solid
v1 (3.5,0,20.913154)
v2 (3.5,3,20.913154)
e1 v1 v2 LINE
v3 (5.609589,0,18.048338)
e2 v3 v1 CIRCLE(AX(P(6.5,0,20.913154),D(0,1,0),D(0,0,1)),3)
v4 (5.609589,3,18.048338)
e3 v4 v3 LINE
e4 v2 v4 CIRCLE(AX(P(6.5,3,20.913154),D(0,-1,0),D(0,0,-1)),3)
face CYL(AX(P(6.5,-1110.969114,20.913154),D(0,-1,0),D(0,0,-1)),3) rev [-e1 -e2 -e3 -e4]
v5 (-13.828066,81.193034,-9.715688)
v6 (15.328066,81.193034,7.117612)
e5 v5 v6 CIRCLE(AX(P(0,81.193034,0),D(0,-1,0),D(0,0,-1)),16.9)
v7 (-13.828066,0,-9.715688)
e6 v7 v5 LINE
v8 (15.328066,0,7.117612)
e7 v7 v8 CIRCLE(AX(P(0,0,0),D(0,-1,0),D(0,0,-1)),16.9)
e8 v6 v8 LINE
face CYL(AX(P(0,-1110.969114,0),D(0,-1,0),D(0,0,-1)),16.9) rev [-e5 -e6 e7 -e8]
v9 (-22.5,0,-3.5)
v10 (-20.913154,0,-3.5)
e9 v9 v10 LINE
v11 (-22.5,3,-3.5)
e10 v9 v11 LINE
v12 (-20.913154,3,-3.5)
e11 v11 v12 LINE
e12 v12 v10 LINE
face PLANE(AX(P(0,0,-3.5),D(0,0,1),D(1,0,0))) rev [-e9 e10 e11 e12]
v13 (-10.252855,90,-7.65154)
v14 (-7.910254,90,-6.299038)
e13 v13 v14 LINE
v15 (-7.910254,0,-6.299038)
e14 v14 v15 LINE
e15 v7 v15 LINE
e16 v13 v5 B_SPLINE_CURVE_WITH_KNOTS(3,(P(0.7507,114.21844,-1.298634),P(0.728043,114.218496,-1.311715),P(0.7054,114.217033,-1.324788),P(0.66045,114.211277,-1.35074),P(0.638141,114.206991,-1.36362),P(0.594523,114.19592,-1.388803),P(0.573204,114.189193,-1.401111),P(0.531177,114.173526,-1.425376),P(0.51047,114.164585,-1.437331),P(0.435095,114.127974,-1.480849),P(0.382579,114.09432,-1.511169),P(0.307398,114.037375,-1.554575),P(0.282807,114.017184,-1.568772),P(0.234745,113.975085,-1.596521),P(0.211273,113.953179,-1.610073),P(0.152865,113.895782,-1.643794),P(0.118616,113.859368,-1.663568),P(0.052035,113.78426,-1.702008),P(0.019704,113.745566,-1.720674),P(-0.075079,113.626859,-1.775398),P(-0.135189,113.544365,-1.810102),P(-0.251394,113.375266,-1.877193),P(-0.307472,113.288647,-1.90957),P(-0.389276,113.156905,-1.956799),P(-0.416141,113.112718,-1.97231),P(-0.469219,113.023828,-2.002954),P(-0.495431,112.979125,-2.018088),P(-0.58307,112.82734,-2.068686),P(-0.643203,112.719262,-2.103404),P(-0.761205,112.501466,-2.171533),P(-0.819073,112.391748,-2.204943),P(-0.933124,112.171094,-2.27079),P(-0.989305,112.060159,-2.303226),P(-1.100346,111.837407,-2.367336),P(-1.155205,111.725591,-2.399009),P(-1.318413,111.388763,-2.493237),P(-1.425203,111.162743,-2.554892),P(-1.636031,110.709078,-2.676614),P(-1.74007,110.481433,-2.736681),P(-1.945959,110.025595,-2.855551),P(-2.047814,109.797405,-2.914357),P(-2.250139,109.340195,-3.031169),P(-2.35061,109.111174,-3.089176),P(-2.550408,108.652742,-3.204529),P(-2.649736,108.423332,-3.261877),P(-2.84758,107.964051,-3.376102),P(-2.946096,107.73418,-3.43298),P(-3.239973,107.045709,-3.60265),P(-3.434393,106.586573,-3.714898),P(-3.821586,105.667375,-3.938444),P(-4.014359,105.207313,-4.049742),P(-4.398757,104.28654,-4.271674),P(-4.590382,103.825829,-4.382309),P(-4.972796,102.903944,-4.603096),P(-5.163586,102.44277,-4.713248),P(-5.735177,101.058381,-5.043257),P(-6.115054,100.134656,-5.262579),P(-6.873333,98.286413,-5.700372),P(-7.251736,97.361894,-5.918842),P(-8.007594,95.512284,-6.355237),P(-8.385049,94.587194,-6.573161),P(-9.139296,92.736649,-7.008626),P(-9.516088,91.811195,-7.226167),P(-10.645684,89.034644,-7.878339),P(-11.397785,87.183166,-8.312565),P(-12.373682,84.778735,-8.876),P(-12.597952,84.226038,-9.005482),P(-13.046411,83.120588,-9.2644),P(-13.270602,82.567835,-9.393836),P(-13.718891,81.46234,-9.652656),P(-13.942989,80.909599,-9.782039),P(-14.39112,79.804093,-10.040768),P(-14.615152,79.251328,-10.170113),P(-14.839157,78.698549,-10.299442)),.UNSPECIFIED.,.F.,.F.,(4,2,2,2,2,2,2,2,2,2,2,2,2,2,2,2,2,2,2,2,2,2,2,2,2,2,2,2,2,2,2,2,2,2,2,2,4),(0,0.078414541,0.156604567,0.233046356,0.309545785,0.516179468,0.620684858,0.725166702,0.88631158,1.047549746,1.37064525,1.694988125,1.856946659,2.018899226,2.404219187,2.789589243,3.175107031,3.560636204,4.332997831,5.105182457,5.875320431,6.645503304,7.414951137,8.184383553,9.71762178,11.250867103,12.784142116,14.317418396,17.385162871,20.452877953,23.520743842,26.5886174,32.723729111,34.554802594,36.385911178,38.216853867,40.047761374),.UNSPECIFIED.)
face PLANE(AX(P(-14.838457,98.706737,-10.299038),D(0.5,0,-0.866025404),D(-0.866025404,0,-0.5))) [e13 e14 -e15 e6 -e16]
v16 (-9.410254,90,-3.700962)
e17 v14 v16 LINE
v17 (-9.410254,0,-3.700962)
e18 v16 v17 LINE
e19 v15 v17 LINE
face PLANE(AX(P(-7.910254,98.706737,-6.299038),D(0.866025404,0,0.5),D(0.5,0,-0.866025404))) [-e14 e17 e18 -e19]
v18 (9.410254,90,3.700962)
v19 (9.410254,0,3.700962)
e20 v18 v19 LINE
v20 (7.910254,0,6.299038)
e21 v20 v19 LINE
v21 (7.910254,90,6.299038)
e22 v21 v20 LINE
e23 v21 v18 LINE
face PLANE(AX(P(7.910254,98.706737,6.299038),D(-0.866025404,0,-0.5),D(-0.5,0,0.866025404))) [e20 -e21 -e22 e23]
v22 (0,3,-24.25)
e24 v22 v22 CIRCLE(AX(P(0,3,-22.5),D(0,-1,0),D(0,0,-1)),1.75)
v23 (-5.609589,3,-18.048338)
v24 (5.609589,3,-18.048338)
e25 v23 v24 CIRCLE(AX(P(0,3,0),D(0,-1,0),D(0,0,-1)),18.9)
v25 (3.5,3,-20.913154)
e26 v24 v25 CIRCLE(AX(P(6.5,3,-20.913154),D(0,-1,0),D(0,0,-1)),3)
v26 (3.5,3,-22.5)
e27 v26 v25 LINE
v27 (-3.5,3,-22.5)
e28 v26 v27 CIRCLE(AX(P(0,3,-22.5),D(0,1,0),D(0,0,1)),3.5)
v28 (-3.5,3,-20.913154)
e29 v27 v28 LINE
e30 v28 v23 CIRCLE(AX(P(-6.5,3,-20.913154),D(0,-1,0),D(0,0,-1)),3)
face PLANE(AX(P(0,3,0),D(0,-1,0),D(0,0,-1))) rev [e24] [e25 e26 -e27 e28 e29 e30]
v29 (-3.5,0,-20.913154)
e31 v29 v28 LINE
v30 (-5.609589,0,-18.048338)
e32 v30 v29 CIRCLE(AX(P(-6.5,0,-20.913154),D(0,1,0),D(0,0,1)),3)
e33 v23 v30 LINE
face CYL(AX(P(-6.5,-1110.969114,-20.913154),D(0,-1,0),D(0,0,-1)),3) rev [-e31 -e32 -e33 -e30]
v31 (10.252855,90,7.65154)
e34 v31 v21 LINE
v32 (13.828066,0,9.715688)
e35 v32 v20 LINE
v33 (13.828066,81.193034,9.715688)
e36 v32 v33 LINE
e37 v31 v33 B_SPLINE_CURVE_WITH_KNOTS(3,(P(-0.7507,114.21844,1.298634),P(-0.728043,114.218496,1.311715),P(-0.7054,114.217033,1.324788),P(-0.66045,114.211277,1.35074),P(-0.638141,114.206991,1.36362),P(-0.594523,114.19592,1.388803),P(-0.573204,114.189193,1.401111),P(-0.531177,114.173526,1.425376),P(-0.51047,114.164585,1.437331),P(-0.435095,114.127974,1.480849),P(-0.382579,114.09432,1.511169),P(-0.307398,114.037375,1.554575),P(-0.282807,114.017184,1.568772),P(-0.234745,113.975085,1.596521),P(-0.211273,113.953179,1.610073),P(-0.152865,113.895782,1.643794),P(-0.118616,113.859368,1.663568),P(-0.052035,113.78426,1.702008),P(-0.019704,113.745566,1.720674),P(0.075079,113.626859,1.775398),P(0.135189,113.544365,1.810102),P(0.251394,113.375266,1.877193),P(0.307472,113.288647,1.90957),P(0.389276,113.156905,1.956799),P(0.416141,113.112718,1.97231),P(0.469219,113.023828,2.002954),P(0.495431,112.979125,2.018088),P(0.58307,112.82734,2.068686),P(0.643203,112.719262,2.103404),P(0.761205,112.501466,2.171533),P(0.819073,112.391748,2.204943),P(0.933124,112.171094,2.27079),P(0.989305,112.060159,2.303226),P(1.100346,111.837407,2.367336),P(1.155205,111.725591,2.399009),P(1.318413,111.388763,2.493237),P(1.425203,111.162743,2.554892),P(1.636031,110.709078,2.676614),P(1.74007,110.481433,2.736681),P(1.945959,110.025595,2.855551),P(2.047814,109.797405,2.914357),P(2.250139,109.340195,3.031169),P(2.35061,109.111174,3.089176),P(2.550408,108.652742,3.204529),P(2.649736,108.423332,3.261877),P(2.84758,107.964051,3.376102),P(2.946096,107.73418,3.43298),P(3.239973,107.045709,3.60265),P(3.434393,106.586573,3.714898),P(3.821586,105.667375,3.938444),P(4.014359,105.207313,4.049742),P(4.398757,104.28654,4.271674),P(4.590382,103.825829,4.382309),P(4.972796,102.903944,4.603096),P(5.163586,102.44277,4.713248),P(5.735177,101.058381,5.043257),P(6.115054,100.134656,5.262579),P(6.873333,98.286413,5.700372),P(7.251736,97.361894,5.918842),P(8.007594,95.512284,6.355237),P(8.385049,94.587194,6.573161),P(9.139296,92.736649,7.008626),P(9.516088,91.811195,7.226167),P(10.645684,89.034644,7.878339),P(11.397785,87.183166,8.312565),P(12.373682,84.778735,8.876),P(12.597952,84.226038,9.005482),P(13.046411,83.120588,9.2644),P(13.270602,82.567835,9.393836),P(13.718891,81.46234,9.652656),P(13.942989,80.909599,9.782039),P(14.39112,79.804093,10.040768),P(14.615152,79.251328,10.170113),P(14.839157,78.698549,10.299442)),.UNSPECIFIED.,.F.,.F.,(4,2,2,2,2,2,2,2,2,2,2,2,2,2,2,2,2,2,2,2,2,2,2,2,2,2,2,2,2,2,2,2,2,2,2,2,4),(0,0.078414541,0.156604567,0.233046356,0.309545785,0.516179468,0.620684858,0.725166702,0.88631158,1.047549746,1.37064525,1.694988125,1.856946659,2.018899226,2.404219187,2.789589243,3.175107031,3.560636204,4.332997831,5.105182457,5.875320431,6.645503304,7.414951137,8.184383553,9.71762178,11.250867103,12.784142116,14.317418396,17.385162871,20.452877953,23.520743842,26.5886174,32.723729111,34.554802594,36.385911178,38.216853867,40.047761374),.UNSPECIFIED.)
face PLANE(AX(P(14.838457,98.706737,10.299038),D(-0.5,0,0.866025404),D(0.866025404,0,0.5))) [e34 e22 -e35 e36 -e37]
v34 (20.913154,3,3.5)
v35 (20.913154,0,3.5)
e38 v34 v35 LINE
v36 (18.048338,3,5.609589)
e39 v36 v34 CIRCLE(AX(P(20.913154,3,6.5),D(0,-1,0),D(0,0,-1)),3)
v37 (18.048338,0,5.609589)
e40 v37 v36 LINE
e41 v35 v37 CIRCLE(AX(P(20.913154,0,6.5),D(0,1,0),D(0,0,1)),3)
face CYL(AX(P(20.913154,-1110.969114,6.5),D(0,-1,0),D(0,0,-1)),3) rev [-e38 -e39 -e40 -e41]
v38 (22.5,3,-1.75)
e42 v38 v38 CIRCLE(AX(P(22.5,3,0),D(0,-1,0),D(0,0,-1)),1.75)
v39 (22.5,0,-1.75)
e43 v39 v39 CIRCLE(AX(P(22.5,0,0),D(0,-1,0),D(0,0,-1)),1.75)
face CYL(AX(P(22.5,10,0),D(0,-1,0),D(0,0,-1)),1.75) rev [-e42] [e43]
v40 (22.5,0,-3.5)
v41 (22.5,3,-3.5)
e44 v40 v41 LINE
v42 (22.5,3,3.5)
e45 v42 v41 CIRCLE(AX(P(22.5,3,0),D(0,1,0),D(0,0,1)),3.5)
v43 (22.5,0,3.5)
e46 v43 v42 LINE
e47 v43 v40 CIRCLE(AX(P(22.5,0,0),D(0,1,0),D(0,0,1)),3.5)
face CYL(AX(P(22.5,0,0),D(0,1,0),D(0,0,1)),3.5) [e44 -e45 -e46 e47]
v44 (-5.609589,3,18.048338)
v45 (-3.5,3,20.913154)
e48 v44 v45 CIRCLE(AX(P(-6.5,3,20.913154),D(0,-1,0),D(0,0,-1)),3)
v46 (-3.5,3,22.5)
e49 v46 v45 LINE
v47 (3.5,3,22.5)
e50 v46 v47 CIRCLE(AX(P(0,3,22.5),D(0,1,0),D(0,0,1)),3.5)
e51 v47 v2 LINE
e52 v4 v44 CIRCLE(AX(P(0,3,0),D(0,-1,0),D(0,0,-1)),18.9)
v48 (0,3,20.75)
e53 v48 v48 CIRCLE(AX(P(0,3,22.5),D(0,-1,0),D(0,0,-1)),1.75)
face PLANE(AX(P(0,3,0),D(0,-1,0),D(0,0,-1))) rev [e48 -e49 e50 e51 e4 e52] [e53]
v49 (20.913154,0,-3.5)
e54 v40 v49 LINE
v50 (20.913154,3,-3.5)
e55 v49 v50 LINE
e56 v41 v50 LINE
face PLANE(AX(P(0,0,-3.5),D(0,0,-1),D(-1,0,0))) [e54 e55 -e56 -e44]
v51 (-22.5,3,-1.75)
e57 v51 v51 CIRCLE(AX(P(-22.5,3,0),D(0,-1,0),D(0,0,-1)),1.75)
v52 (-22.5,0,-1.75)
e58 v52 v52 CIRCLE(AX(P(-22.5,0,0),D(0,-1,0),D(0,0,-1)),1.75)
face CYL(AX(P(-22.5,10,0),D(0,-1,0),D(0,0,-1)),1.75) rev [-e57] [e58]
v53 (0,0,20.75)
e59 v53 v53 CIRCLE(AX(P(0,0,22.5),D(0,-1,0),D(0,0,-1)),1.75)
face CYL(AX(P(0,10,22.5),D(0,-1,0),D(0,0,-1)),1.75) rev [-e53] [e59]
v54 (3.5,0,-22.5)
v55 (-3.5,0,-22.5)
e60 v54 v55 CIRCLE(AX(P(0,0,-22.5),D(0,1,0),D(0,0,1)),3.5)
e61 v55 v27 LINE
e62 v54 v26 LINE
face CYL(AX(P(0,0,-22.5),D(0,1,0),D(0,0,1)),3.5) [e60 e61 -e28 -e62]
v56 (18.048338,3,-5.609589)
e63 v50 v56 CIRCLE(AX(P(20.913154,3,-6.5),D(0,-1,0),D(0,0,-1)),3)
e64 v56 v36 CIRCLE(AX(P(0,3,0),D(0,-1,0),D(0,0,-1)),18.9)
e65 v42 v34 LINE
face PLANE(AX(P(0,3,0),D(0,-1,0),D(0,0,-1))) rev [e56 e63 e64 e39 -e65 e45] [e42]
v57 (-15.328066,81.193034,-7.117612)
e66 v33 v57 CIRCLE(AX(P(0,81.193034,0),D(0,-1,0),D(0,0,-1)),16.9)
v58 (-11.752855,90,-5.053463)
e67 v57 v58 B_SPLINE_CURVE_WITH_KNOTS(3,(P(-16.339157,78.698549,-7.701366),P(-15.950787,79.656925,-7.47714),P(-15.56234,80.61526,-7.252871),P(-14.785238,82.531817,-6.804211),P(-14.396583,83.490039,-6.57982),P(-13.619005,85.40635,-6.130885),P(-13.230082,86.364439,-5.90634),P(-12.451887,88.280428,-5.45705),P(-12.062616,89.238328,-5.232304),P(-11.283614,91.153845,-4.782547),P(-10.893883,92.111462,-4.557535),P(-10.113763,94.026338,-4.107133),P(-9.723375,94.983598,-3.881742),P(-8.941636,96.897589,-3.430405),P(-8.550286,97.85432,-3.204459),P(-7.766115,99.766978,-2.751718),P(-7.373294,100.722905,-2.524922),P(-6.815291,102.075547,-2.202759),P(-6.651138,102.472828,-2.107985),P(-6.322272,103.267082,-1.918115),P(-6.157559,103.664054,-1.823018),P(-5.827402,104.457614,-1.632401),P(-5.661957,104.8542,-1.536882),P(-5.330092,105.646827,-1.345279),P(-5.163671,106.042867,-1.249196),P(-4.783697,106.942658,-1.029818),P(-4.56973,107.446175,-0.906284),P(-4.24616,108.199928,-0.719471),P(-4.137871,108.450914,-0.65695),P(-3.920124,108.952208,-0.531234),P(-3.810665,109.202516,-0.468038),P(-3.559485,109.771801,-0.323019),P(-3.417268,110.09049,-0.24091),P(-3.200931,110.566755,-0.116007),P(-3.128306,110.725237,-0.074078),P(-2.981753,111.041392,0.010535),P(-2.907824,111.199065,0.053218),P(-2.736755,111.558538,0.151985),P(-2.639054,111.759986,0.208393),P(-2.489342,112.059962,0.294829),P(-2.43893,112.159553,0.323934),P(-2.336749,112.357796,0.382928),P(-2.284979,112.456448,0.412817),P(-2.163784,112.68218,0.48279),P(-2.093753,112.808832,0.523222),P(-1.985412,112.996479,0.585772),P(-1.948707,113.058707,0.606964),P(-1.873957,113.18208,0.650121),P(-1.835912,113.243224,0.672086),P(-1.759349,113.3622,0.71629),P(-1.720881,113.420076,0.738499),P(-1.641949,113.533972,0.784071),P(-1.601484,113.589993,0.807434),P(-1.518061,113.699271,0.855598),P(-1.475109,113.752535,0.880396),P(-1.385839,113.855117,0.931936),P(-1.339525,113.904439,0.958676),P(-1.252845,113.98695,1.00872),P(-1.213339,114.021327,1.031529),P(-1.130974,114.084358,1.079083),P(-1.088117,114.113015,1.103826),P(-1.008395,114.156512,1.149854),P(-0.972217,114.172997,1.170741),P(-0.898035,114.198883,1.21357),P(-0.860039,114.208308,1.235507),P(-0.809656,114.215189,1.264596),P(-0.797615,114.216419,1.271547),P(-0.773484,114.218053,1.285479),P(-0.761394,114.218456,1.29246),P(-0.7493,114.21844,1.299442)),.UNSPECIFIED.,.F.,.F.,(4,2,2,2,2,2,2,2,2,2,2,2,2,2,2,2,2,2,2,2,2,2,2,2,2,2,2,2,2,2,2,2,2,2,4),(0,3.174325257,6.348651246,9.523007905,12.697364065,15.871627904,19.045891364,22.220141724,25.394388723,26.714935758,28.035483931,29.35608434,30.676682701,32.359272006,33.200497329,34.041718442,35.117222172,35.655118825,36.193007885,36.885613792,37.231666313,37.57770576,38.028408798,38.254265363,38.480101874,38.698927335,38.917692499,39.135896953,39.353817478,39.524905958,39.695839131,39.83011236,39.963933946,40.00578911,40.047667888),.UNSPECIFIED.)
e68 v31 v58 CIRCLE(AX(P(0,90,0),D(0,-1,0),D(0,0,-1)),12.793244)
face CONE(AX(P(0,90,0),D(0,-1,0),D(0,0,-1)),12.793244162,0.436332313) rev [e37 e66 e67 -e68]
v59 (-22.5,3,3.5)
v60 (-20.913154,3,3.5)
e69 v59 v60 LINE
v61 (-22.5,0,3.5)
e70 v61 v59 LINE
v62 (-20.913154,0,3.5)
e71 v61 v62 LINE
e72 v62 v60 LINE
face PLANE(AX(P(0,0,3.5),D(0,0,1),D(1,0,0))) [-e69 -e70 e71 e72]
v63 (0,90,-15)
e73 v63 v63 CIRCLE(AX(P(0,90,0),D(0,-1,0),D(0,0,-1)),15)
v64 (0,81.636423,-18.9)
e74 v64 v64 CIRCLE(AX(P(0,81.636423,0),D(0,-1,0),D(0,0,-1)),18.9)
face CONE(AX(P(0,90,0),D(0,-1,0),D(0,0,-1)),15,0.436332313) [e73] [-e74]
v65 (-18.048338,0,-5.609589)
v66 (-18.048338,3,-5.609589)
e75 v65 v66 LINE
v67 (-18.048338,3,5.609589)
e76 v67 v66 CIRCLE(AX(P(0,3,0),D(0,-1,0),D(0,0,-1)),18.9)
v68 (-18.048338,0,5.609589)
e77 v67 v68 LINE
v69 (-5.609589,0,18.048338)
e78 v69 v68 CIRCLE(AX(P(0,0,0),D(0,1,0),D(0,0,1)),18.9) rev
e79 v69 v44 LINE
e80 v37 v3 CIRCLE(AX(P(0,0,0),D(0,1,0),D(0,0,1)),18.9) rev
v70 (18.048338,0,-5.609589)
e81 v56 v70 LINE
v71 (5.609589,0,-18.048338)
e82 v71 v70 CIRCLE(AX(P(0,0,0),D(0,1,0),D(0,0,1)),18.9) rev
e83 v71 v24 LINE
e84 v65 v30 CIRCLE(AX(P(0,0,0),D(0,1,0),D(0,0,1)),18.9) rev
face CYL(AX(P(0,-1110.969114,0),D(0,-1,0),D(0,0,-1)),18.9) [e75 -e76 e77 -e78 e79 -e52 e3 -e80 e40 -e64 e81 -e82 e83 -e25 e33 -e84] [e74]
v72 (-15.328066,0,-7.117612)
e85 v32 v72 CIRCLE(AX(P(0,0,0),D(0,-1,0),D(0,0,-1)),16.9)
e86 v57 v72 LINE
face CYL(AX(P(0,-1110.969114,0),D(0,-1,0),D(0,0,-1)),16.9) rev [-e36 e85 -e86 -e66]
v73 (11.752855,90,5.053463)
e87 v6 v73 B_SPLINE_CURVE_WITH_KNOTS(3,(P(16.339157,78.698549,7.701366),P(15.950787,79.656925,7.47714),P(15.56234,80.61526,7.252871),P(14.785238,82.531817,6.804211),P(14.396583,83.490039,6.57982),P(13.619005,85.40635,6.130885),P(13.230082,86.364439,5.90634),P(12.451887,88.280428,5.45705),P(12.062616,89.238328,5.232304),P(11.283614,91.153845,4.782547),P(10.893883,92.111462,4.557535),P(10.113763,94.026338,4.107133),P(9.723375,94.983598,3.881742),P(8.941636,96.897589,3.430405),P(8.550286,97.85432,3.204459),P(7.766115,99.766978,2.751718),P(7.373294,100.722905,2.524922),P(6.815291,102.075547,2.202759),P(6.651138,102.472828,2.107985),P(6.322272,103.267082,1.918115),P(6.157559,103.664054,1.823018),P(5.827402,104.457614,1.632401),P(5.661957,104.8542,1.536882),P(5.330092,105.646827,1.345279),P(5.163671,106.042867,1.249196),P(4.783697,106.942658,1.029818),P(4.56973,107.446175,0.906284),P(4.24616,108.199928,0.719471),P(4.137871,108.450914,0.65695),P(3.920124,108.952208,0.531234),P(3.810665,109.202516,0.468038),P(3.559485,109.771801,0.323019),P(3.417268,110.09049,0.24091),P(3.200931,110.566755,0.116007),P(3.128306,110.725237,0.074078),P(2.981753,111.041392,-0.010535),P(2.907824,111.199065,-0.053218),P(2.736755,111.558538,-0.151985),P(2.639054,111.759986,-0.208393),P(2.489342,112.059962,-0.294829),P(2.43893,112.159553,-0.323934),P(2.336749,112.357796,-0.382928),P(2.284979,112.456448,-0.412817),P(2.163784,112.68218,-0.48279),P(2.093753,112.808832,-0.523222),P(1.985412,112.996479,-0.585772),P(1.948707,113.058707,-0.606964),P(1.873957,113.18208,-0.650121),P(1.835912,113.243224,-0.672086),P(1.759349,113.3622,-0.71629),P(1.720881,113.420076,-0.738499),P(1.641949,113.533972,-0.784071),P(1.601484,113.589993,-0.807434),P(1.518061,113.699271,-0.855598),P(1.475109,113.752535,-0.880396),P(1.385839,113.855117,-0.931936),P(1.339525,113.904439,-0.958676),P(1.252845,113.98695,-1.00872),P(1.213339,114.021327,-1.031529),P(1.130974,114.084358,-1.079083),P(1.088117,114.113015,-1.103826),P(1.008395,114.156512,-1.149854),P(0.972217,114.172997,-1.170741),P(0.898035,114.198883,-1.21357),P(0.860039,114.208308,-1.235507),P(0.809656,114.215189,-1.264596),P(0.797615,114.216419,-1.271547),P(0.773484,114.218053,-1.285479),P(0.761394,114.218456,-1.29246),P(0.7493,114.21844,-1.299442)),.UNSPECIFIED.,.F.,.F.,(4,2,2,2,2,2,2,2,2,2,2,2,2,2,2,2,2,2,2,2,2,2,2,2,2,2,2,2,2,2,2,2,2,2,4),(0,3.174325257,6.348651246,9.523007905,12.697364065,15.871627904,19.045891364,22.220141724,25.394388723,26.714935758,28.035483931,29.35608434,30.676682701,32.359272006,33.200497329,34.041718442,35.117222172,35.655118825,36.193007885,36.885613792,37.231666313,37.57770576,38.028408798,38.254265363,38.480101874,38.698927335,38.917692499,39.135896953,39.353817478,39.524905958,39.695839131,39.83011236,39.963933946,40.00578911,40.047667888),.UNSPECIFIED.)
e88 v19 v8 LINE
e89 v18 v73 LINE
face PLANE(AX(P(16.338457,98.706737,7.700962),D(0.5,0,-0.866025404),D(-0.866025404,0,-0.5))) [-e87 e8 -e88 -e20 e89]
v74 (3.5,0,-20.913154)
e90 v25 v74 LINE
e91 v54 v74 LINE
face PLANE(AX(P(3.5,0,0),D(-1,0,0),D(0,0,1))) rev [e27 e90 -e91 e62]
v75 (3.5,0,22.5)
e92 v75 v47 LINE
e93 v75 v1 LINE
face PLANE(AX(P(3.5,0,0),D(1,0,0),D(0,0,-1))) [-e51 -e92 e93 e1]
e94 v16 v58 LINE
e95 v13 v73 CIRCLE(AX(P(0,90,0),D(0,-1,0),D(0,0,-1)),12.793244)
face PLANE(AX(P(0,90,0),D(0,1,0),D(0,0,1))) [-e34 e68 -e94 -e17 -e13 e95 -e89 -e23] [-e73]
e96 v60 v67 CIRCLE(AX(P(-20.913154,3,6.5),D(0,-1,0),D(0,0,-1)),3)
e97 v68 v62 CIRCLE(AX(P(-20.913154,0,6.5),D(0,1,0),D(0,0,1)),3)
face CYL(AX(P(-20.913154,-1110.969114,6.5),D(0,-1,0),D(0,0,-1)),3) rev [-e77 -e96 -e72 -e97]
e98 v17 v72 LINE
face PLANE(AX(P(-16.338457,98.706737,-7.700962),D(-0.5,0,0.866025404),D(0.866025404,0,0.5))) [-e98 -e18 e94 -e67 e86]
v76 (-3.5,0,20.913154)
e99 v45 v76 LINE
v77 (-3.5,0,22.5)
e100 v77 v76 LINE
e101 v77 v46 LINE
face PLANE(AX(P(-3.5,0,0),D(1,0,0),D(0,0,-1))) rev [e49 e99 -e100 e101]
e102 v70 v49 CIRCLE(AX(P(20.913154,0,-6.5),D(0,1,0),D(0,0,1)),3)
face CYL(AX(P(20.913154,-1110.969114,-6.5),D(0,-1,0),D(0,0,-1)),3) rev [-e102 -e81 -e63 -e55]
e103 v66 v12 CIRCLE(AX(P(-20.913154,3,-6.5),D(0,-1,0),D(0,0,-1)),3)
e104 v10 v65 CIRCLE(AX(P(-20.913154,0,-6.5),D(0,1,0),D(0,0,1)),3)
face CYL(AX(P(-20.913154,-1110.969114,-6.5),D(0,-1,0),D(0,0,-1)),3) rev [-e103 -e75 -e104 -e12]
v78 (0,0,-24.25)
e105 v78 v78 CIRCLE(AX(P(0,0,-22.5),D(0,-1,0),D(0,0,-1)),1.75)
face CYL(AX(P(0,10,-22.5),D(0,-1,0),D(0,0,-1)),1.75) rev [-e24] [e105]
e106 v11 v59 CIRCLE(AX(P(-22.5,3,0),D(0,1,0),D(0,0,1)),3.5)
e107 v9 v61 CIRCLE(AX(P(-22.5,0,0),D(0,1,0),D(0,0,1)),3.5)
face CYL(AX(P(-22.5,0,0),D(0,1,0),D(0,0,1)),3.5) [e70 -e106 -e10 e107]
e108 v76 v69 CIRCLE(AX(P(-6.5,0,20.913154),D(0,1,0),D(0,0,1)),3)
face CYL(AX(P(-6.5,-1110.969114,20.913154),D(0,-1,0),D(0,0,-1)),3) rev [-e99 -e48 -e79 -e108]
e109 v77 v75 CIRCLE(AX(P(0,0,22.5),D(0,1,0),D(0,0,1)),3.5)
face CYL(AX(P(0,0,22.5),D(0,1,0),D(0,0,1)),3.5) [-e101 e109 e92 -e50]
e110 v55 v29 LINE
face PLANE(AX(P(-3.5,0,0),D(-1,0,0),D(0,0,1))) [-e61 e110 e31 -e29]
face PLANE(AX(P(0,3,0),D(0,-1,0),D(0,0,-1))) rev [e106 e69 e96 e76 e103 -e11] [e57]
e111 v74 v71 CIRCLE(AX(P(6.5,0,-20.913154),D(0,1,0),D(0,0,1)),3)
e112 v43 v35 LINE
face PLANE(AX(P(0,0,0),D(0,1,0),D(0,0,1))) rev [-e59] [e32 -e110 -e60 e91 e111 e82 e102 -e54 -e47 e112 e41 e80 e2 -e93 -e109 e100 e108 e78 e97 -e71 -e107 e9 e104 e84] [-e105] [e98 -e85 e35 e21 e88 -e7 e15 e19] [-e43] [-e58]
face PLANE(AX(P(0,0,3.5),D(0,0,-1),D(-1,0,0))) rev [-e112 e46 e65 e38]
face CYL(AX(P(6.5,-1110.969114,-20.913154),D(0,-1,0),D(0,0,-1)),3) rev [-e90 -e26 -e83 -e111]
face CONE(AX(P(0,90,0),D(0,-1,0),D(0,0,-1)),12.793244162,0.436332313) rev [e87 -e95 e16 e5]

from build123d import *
from build123d.topology import SkipClean

# Parameters (mm, degrees)
SKETCH2_R           = 1.75
CUT_EXTRUDE1_DEPTH  = 10
SKETCH4_R           = 36.837485066
SKETCH4_R_2         = 31.9
CUT_EXTRUDE2_DEPTH  = 99.001122443
FILLET1_R           = 3
BOSS_EXTRUDE1_REACH = 99.221


with BuildPart() as part:
    # Sketch1 → Revolve1 (revolve)
    with BuildSketch(Plane(origin=(0, 0, 0), x_dir=(0, 0, -1), z_dir=(1, 0, 0)), mode=Mode.PRIVATE) as revolve1_sk:
        Polygon((-12.793244162, 90), (-15, 90), (-18.9, 81.63642301), (-18.9, 3), (-31.9, 3), (-31.9, 0), (-17.6, 0), (-16.9, 0), (-16.9, 81.193033685), align=None)
    revolve(revolve1_sk.sketch.rotate(Axis((0, -1110.96911415, 0), (0, 1, 0)), 180), axis=Axis((0, -1110.96911415, 0), (0, 1, 0)))

    # Sketch2 → Cut-Extrude1 (cut)
    with BuildSketch(Plane.XZ):
        with Locations(Location((0, 22.5, 0), (0, 0, 270))):
            Circle(SKETCH2_R)
        with Locations(Location((0, -22.5, 0), (0, 0, 270))):
            Circle(SKETCH2_R)
        with Locations(Location((-22.5, 0, 0), (0, 0, 270))):
            Circle(SKETCH2_R)
        with Locations(Location((22.5, 0, 0), (0, 0, 270))):
            Circle(SKETCH2_R)
    extrude(amount=-CUT_EXTRUDE1_DEPTH, mode=Mode.SUBTRACT)

    # Sketch4 → Cut-Extrude2 (cut, through all)
    # profile 1 of 2: a face of its own
    with SkipClean():  # the faces are left unmerged after this step: merging them gives an invalid solid
        with BuildSketch(Plane(origin=(0, 3, 0), x_dir=(1, 0, 0), z_dir=(0, 1, 0))):
            Circle(SKETCH4_R)
            Circle(SKETCH4_R_2, mode=Mode.SUBTRACT)
        # profile 2 of 2: a face of its own
        with BuildSketch(Plane(origin=(0, 3, 0), x_dir=(1, 0, 0), z_dir=(0, 1, 0))):
            Circle(SKETCH4_R_2)
            with BuildLine():
                Line((-3.5, 18.573098826), (-3.5, 22.5))
                ThreePointArc((-3.5, 22.5), (0, 26), (3.5, 22.5))
                Line((3.5, 22.5), (3.5, 18.573098826))
                ThreePointArc((3.5, 18.573098826), (13.364318164, 13.364318164), (18.573098826, 3.5))
                Line((18.573098826, 3.5), (22.5, 3.5))
                ThreePointArc((22.5, 3.5), (26, 0), (22.5, -3.5))
                Line((22.5, -3.5), (18.573098826, -3.5))
                ThreePointArc((18.573098826, -3.5), (13.364318164, -13.364318164), (3.5, -18.573098826))
                Line((3.5, -18.573098826), (3.5, -22.5))
                ThreePointArc((3.5, -22.5), (0, -26), (-3.5, -22.5))
                Line((-3.5, -22.5), (-3.5, -18.573098826))
                ThreePointArc((-3.5, -18.573098826), (-13.364318164, -13.364318164), (-18.573098826, -3.5))
                Line((-18.573098826, -3.5), (-22.5, -3.5))
                ThreePointArc((-22.5, -3.5), (-26, 0), (-22.5, 3.5))
                Line((-22.5, 3.5), (-18.573098826, 3.5))
                ThreePointArc((-18.573098826, 3.5), (-13.364318164, 13.364318164), (-3.5, 18.573098826))
            make_face(mode=Mode.SUBTRACT)
        extrude(amount=-CUT_EXTRUDE2_DEPTH, mode=Mode.SUBTRACT)

    # Fillet1
    # the kernel refuses this fillet: 3 mm, written as the material it adds along each edge
    with BuildSketch(Plane(origin=(-3.5, 3, -18.573098826), x_dir=(-0.9704272072576611, 0, 0.24139394237241404), z_dir=(0, -1, 0)), Plane(origin=(-18.573098826, 3, 3.5), x_dir=(0.24139394237237982, -3.328806956187132e-15, 0.9704272072576697), z_dir=(0, -1, 0)), Plane(origin=(3.5, 3, 18.573098826), x_dir=(0.970427207257667, 0, -0.24139394237239048), z_dir=(0, -1, 0)), Plane(origin=(18.573098826, 3, -3.5), x_dir=(-0.24139394237243622, 3.3288069561870833e-15, -0.9704272072576556), z_dir=(0, -1, 0))) as fillet1_piece_1:
        with BuildLine():
            CenterArc((2.346406537, 2.995034797), FILLET1_R, 193.968826574, 72.734276137)
            Line((-0.564875085, 2.27085297), (0, 0))
            ThreePointArc((0, 0), (1.086938322, 0.031280778), (2.173876645, 0))
        make_face()
    extrude(amount=3)
    with BuildSketch(Plane(origin=(-18.573098826, 3, -3.5), x_dir=(0.24139394237239928, 3.3288069561871153e-15, -0.9704272072576648), z_dir=(0, -1, 0)), Plane(origin=(-3.5, 3, 18.573098826), x_dir=(-0.9704272072576595, 0, -0.24139394237242057), z_dir=(0, -1, 0)), Plane(origin=(18.573098826, 3, 3.5), x_dir=(-0.24139394237244305, -3.328806956187078e-15, 0.970427207257654), z_dir=(0, -1, 0)), Plane(origin=(3.5, 3, -18.573098826), x_dir=(0.9704272072576657, 0, 0.2413939423723955), z_dir=(0, -1, 0))) as fillet1_piece_2:
        with BuildLine():
            CenterArc((2.346406537, -2.995034797), FILLET1_R, 93.296897289, 72.734276137)
            Line((-0.564875085, -2.27085297), (0, 0))
            ThreePointArc((0, 0), (1.086938322, -0.031280778), (2.173876645, 0))
        make_face()
    extrude(amount=3)

    # Boss-Extrude1: up to this cone (the profile starts inside it)
    boss_extrude1_end = Plane(origin=(0, 0, 0), z_dir=(0, -1, 0)).offset(-117.435199641) * Cone(1e-06, 126.797041985, 271.917133037, align=(Align.CENTER, Align.CENTER, Align.MIN), mode=Mode.PRIVATE)
    # Sketch5 → Boss-Extrude1 (add, up to the surface)
    with BuildSketch(Plane.XZ, mode=Mode.PRIVATE) as boss_extrude1_sk1:
        Polygon((14.838457268, 10.299038106), (16.338457268, 7.700961894), (9.410254038, 3.700961894), (7.910254038, 6.299038106), align=None)
    boss_extrude1_tool1 = extrude(boss_extrude1_sk1.sketch, amount=-BOSS_EXTRUDE1_REACH, mode=Mode.PRIVATE) & boss_extrude1_end
    add(boss_extrude1_tool1.solids().sort_by_distance((12.124356, 0, 7))[0])
    # Sketch5 → Boss-Extrude1 (add, up to the surface)
    with BuildSketch(Plane.XZ, mode=Mode.PRIVATE) as boss_extrude1_sk2:
        Polygon((-14.838457268, -10.299038106), (-16.338457268, -7.700961894), (-9.410254038, -3.700961894), (-7.910254038, -6.299038106), align=None)
    boss_extrude1_tool2 = extrude(boss_extrude1_sk2.sketch, amount=-BOSS_EXTRUDE1_REACH, mode=Mode.PRIVATE) & boss_extrude1_end
    add(boss_extrude1_tool2.solids().sort_by_distance((-12.124356, 0, -7))[0])

    # SurfaceCut2
    split(bisect_by=Plane(origin=(0, 90, 0), x_dir=(1, 0, 0), z_dir=(0, 1, 0)), keep=Keep.BOTTOM)


solid = part.part
